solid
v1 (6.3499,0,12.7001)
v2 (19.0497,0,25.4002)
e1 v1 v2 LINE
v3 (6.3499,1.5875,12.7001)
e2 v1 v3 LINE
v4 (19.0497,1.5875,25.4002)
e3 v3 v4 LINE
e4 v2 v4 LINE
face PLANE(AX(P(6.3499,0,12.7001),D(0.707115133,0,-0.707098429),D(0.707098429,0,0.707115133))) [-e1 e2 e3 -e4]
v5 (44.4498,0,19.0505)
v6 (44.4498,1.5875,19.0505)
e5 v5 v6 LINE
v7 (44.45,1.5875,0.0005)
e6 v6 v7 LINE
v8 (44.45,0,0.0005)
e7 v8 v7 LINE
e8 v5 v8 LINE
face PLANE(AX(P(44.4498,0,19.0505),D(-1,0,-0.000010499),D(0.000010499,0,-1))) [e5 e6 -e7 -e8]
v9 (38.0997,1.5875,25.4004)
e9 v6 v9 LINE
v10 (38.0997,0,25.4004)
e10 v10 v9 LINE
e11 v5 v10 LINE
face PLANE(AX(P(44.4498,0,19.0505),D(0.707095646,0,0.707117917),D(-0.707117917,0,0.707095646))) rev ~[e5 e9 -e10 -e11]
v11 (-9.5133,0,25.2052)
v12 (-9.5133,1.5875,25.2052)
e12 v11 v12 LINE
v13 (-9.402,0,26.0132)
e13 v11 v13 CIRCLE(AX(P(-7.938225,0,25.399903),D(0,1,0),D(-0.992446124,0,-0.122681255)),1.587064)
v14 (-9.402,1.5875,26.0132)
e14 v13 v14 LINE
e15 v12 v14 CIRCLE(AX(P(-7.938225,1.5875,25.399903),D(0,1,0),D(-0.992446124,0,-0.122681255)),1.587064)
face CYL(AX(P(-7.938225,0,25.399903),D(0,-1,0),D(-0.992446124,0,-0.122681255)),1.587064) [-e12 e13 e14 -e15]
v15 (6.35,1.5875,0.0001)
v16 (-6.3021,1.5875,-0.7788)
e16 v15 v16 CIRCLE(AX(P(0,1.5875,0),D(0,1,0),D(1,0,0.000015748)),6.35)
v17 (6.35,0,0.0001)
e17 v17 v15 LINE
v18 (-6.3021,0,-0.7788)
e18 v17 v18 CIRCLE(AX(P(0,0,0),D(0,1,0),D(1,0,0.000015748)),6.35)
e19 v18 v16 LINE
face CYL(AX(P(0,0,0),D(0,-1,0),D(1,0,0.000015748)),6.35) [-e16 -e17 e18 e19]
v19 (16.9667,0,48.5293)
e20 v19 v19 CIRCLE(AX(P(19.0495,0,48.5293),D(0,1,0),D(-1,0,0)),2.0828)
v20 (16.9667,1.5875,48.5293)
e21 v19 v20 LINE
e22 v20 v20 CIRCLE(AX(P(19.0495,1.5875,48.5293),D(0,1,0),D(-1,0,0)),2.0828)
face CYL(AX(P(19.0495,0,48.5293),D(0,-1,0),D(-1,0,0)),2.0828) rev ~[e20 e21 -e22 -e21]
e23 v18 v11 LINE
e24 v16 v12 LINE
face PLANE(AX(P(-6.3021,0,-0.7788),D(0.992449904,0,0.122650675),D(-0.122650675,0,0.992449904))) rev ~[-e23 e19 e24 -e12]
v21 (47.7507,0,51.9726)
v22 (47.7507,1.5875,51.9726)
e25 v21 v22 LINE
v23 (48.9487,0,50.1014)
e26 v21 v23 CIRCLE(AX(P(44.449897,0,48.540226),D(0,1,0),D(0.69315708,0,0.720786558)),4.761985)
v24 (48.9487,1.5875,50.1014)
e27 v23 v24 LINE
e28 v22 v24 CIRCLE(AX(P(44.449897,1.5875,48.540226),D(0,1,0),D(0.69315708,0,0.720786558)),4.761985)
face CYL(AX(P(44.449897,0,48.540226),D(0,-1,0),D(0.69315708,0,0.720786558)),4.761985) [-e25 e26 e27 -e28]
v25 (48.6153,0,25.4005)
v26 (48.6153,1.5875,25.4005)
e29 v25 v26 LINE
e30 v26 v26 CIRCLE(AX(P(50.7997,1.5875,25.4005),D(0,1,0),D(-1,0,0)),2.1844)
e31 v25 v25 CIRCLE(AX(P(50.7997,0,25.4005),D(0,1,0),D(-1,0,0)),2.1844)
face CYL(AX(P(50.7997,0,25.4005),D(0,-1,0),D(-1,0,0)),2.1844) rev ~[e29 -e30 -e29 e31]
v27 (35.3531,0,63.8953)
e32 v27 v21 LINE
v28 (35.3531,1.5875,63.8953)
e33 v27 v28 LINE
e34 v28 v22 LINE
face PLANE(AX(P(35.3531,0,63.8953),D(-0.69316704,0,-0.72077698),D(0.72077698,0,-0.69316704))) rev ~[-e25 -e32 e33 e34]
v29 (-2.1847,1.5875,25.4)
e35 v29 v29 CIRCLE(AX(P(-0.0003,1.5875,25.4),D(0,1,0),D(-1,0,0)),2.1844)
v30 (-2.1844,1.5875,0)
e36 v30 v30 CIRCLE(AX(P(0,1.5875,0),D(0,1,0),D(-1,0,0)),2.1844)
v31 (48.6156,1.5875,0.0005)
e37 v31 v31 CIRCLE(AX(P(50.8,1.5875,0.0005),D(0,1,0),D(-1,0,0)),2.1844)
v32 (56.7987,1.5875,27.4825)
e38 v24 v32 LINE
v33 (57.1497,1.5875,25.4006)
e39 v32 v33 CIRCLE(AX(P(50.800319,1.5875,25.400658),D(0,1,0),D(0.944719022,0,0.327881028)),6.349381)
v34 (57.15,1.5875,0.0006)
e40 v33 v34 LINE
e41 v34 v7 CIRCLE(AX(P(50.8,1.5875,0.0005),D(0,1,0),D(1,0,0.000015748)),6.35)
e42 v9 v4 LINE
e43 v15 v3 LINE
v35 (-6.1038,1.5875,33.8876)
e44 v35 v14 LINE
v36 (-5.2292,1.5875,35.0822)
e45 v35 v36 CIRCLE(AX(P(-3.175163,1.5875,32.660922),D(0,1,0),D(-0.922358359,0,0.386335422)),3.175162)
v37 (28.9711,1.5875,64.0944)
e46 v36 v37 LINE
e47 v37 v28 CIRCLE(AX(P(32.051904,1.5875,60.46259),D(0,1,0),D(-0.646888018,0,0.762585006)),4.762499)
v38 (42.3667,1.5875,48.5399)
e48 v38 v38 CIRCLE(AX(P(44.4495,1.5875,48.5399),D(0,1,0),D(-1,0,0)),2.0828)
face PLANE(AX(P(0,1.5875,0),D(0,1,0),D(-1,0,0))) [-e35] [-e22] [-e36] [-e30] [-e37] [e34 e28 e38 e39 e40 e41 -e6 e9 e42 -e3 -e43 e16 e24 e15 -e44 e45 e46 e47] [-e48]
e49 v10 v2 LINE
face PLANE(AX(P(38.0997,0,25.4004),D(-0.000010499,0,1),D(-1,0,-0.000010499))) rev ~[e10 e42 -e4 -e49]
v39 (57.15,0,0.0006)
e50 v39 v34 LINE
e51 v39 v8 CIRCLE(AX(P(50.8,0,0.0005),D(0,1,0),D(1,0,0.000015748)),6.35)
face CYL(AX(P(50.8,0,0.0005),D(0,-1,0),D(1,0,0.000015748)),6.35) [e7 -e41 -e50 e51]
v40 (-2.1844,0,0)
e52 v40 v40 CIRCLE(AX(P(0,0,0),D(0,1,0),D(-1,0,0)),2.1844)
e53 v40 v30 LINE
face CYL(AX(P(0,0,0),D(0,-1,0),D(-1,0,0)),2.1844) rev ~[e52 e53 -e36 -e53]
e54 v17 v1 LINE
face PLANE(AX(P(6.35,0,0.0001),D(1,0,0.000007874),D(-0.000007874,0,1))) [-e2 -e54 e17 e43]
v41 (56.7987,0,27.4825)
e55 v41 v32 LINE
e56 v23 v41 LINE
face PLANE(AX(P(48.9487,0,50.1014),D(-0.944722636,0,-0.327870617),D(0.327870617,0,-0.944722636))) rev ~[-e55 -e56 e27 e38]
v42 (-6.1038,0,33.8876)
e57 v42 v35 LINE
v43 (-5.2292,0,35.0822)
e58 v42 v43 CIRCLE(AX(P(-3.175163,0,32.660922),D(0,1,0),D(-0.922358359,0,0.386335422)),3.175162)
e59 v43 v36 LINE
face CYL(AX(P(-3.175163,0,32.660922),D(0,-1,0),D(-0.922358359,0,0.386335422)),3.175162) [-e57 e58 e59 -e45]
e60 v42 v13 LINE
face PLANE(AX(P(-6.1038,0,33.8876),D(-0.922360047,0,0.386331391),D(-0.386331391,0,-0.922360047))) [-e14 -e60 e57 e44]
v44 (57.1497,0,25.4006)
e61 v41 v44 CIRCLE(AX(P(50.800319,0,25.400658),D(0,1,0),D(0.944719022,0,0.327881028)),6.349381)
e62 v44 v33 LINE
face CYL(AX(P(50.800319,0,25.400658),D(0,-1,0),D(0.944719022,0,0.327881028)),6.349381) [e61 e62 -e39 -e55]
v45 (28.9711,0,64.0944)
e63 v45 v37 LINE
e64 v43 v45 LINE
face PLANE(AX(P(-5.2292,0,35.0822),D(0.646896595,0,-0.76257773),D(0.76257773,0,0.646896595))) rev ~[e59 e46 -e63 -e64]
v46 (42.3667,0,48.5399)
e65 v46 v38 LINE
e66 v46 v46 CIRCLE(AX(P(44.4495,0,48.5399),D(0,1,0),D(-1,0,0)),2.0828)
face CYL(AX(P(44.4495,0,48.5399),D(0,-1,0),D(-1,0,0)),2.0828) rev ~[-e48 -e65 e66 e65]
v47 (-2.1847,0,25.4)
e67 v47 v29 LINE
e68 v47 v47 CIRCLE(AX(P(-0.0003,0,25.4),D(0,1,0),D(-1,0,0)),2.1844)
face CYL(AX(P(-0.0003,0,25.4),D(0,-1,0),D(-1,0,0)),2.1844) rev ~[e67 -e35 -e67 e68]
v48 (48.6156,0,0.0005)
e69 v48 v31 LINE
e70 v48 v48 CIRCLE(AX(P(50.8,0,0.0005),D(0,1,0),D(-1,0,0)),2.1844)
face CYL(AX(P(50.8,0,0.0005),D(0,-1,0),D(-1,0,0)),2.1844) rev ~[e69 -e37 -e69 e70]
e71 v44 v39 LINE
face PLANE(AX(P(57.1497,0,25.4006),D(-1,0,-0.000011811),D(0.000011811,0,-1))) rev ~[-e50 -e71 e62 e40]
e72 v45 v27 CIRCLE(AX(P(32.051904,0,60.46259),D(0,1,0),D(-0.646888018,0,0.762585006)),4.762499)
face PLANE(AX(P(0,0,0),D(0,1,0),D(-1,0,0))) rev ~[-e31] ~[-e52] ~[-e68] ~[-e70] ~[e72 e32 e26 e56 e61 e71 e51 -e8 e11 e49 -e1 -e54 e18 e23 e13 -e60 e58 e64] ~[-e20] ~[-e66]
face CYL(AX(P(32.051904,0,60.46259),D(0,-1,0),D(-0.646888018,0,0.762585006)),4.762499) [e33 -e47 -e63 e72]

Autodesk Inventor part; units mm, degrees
ref_plane "YZ Plane" through (0, 0, 0) normal (1, 0, 0) x (0, 1, 0)
ref_plane "XZ Plane" through (0, 0, 0) normal (0, 1, 0) x (-1, 0, 0)
ref_plane "XY Plane" through (0, 0, 0) normal (0, 0, 1) x (1, 0, 0)
sketch "main" plane through (0, 0, 0) normal (0, 0, 1) x (1, 0, 0)
  circle A0 centre (9.0037, 34.4943) radius 2.1844
  line L0 (21.7037, 28.1443) -> (9.0037, 15.4443)
  line L1 (34.4037, 28.1443) -> (21.7037, 28.1443)
  circle A1 centre (34.4037, 34.4943) radius 2.1844
  arc A2 (34.4037, 28.1443) -> (34.4037, 40.8443) centre (34.4037, 34.4943) ccw
  arc A3 (-17.5684, -13.257) -> (-15.6972, -14.455) centre (-14.1357, -9.9557) ccw
  circle A4 centre (-14.1357, -9.9557) radius 2.0828
  line L2 (-15.6972, -14.455) -> (6.9217, -22.3047)
  circle A5 centre (-14.1255, 15.4443) radius 2.0828
  line L3 (-29.4913, -0.8595) -> (-17.5684, -13.257)
  arc A6 (-29.6904, 5.5225) -> (-29.4913, -0.8595) centre (-26.0586, 2.4417) ccw
  line L4 (-0.6786, 39.7231) -> (-29.6904, 5.5225)
  line L5 (9.0037, -3.6057) -> (9.0037, 15.4443)
  line L6 (15.3537, -9.9557) -> (34.4037, -9.9557)
  line L7 (15.3537, -9.9557) -> (9.0037, -3.6057)
  circle A7 centre (34.4037, -16.3057) radius 2.1844
  arc A8 (34.4037, -22.6557) -> (34.4037, -9.9557) centre (34.4037, -16.3057) ccw
  circle A9 centre (9.0037, -16.3057) radius 2.1844
  arc A10 (6.9217, -22.3047) -> (9.0037, -22.6557) centre (9.0037, -16.3057) ccw
  line L8 (9.0037, -22.6557) -> (34.4037, -22.6557)
  arc A11 (0.516, 40.5978) -> (-0.6786, 39.7231) centre (1.7426, 37.6693) ccw
  arc A12 (9.1983, 44.0073) -> (8.3903, 43.896) centre (9.0036, 42.4318) ccw
  line L9 (0.516, 40.5978) -> (8.3903, 43.896)
  line L10 (35.1824, 40.7963) -> (9.1983, 44.0073)
  point P0 (6.3419, 6.6617)
  point P1 (9.0037, 28.1443)
  point P2 (0.2724, 40.8443)
  point P3 (-32.4736, 2.2415)
  point P4 (9.0037, -9.9557)
  dimension "d0" = 4.1656
  dimension "d1" = 9.525
  dimension "d2" = 12.7
  dimension "d3" = 12.7
  dimension "d4" = 6.35
  dimension "d5" = 6.35
  dimension "d6" = 4.1656
  dimension "d7" = 4.7625
  dimension "d9" = 3.175
  dimension "d12" = 48.5394
  dimension "d14" = 3.175
  dimension "d16" = 25.4
  dimension "d17" = 48.5291
  dimension "d18" = 6.35
sketch "Sketch1" plane through (0, 0, 0) normal (0, 1, 0) x (-1, 0, 0)
  circle A0 centre (0.0003, 25.4) radius 2.1844
  line L0 (-6.3499, 12.7001) -> (-19.0497, 25.4002)
  line L1 (-6.35, 0.0001) -> (-6.3499, 12.7001)
  circle A1 centre (0, 0) radius 2.1844
  arc A2 (-6.35, 0.0001) -> (6.35, -0.0001) centre (0, 0) ccw
  arc A3 (-47.7507, 51.9726) -> (-48.9487, 50.1014) centre (-44.4495, 48.5399) ccw
  circle A4 centre (-44.4495, 48.5399) radius 2.0828
  line L2 (-48.9487, 50.1014) -> (-56.7987, 27.4825)
  circle A5 centre (-19.0495, 48.5293) radius 2.0828
  line L3 (-35.3531, 63.8953) -> (-47.7507, 51.9726)
  arc A6 (-28.9711, 64.0944) -> (-35.3531, 63.8953) centre (-32.0519, 60.4626) ccw
  line L4 (5.2292, 35.0822) -> (-28.9711, 64.0944)
  line L5 (-38.0997, 25.4004) -> (-19.0497, 25.4002)
  line L6 (-44.4498, 19.0505) -> (-44.45, 0.0005)
  line L7 (-44.4498, 19.0505) -> (-38.0997, 25.4004)
  circle A7 centre (-50.8, 0.0005) radius 2.1844
  arc A8 (-57.15, 0.0006) -> (-44.45, 0.0005) centre (-50.8, 0.0005) ccw
  circle A9 centre (-50.7997, 25.4005) radius 2.1844
  arc A10 (-56.7987, 27.4825) -> (-57.1497, 25.4006) centre (-50.7997, 25.4005) ccw
  line L8 (-57.1497, 25.4006) -> (-57.15, 0.0006)
  arc A11 (6.1038, 33.8876) -> (5.2292, 35.0822) centre (3.1753, 32.661) ccw
  arc A12 (9.5133, 25.2052) -> (9.402, 26.0132) centre (7.9378, 25.3999) ccw
  line L9 (6.1038, 33.8876) -> (9.402, 26.0132)
  line L10 (6.3021, -0.7788) -> (9.5133, 25.2052)
  point P0 (0, 0)
extrude "Extrusion1" add sketch "Sketch1" along normal blind 1.5875
equation "\"d3\" = d2"
equation "\"d5\" = d4"
properties part number "gusset" material "Acetal Resin, White"
